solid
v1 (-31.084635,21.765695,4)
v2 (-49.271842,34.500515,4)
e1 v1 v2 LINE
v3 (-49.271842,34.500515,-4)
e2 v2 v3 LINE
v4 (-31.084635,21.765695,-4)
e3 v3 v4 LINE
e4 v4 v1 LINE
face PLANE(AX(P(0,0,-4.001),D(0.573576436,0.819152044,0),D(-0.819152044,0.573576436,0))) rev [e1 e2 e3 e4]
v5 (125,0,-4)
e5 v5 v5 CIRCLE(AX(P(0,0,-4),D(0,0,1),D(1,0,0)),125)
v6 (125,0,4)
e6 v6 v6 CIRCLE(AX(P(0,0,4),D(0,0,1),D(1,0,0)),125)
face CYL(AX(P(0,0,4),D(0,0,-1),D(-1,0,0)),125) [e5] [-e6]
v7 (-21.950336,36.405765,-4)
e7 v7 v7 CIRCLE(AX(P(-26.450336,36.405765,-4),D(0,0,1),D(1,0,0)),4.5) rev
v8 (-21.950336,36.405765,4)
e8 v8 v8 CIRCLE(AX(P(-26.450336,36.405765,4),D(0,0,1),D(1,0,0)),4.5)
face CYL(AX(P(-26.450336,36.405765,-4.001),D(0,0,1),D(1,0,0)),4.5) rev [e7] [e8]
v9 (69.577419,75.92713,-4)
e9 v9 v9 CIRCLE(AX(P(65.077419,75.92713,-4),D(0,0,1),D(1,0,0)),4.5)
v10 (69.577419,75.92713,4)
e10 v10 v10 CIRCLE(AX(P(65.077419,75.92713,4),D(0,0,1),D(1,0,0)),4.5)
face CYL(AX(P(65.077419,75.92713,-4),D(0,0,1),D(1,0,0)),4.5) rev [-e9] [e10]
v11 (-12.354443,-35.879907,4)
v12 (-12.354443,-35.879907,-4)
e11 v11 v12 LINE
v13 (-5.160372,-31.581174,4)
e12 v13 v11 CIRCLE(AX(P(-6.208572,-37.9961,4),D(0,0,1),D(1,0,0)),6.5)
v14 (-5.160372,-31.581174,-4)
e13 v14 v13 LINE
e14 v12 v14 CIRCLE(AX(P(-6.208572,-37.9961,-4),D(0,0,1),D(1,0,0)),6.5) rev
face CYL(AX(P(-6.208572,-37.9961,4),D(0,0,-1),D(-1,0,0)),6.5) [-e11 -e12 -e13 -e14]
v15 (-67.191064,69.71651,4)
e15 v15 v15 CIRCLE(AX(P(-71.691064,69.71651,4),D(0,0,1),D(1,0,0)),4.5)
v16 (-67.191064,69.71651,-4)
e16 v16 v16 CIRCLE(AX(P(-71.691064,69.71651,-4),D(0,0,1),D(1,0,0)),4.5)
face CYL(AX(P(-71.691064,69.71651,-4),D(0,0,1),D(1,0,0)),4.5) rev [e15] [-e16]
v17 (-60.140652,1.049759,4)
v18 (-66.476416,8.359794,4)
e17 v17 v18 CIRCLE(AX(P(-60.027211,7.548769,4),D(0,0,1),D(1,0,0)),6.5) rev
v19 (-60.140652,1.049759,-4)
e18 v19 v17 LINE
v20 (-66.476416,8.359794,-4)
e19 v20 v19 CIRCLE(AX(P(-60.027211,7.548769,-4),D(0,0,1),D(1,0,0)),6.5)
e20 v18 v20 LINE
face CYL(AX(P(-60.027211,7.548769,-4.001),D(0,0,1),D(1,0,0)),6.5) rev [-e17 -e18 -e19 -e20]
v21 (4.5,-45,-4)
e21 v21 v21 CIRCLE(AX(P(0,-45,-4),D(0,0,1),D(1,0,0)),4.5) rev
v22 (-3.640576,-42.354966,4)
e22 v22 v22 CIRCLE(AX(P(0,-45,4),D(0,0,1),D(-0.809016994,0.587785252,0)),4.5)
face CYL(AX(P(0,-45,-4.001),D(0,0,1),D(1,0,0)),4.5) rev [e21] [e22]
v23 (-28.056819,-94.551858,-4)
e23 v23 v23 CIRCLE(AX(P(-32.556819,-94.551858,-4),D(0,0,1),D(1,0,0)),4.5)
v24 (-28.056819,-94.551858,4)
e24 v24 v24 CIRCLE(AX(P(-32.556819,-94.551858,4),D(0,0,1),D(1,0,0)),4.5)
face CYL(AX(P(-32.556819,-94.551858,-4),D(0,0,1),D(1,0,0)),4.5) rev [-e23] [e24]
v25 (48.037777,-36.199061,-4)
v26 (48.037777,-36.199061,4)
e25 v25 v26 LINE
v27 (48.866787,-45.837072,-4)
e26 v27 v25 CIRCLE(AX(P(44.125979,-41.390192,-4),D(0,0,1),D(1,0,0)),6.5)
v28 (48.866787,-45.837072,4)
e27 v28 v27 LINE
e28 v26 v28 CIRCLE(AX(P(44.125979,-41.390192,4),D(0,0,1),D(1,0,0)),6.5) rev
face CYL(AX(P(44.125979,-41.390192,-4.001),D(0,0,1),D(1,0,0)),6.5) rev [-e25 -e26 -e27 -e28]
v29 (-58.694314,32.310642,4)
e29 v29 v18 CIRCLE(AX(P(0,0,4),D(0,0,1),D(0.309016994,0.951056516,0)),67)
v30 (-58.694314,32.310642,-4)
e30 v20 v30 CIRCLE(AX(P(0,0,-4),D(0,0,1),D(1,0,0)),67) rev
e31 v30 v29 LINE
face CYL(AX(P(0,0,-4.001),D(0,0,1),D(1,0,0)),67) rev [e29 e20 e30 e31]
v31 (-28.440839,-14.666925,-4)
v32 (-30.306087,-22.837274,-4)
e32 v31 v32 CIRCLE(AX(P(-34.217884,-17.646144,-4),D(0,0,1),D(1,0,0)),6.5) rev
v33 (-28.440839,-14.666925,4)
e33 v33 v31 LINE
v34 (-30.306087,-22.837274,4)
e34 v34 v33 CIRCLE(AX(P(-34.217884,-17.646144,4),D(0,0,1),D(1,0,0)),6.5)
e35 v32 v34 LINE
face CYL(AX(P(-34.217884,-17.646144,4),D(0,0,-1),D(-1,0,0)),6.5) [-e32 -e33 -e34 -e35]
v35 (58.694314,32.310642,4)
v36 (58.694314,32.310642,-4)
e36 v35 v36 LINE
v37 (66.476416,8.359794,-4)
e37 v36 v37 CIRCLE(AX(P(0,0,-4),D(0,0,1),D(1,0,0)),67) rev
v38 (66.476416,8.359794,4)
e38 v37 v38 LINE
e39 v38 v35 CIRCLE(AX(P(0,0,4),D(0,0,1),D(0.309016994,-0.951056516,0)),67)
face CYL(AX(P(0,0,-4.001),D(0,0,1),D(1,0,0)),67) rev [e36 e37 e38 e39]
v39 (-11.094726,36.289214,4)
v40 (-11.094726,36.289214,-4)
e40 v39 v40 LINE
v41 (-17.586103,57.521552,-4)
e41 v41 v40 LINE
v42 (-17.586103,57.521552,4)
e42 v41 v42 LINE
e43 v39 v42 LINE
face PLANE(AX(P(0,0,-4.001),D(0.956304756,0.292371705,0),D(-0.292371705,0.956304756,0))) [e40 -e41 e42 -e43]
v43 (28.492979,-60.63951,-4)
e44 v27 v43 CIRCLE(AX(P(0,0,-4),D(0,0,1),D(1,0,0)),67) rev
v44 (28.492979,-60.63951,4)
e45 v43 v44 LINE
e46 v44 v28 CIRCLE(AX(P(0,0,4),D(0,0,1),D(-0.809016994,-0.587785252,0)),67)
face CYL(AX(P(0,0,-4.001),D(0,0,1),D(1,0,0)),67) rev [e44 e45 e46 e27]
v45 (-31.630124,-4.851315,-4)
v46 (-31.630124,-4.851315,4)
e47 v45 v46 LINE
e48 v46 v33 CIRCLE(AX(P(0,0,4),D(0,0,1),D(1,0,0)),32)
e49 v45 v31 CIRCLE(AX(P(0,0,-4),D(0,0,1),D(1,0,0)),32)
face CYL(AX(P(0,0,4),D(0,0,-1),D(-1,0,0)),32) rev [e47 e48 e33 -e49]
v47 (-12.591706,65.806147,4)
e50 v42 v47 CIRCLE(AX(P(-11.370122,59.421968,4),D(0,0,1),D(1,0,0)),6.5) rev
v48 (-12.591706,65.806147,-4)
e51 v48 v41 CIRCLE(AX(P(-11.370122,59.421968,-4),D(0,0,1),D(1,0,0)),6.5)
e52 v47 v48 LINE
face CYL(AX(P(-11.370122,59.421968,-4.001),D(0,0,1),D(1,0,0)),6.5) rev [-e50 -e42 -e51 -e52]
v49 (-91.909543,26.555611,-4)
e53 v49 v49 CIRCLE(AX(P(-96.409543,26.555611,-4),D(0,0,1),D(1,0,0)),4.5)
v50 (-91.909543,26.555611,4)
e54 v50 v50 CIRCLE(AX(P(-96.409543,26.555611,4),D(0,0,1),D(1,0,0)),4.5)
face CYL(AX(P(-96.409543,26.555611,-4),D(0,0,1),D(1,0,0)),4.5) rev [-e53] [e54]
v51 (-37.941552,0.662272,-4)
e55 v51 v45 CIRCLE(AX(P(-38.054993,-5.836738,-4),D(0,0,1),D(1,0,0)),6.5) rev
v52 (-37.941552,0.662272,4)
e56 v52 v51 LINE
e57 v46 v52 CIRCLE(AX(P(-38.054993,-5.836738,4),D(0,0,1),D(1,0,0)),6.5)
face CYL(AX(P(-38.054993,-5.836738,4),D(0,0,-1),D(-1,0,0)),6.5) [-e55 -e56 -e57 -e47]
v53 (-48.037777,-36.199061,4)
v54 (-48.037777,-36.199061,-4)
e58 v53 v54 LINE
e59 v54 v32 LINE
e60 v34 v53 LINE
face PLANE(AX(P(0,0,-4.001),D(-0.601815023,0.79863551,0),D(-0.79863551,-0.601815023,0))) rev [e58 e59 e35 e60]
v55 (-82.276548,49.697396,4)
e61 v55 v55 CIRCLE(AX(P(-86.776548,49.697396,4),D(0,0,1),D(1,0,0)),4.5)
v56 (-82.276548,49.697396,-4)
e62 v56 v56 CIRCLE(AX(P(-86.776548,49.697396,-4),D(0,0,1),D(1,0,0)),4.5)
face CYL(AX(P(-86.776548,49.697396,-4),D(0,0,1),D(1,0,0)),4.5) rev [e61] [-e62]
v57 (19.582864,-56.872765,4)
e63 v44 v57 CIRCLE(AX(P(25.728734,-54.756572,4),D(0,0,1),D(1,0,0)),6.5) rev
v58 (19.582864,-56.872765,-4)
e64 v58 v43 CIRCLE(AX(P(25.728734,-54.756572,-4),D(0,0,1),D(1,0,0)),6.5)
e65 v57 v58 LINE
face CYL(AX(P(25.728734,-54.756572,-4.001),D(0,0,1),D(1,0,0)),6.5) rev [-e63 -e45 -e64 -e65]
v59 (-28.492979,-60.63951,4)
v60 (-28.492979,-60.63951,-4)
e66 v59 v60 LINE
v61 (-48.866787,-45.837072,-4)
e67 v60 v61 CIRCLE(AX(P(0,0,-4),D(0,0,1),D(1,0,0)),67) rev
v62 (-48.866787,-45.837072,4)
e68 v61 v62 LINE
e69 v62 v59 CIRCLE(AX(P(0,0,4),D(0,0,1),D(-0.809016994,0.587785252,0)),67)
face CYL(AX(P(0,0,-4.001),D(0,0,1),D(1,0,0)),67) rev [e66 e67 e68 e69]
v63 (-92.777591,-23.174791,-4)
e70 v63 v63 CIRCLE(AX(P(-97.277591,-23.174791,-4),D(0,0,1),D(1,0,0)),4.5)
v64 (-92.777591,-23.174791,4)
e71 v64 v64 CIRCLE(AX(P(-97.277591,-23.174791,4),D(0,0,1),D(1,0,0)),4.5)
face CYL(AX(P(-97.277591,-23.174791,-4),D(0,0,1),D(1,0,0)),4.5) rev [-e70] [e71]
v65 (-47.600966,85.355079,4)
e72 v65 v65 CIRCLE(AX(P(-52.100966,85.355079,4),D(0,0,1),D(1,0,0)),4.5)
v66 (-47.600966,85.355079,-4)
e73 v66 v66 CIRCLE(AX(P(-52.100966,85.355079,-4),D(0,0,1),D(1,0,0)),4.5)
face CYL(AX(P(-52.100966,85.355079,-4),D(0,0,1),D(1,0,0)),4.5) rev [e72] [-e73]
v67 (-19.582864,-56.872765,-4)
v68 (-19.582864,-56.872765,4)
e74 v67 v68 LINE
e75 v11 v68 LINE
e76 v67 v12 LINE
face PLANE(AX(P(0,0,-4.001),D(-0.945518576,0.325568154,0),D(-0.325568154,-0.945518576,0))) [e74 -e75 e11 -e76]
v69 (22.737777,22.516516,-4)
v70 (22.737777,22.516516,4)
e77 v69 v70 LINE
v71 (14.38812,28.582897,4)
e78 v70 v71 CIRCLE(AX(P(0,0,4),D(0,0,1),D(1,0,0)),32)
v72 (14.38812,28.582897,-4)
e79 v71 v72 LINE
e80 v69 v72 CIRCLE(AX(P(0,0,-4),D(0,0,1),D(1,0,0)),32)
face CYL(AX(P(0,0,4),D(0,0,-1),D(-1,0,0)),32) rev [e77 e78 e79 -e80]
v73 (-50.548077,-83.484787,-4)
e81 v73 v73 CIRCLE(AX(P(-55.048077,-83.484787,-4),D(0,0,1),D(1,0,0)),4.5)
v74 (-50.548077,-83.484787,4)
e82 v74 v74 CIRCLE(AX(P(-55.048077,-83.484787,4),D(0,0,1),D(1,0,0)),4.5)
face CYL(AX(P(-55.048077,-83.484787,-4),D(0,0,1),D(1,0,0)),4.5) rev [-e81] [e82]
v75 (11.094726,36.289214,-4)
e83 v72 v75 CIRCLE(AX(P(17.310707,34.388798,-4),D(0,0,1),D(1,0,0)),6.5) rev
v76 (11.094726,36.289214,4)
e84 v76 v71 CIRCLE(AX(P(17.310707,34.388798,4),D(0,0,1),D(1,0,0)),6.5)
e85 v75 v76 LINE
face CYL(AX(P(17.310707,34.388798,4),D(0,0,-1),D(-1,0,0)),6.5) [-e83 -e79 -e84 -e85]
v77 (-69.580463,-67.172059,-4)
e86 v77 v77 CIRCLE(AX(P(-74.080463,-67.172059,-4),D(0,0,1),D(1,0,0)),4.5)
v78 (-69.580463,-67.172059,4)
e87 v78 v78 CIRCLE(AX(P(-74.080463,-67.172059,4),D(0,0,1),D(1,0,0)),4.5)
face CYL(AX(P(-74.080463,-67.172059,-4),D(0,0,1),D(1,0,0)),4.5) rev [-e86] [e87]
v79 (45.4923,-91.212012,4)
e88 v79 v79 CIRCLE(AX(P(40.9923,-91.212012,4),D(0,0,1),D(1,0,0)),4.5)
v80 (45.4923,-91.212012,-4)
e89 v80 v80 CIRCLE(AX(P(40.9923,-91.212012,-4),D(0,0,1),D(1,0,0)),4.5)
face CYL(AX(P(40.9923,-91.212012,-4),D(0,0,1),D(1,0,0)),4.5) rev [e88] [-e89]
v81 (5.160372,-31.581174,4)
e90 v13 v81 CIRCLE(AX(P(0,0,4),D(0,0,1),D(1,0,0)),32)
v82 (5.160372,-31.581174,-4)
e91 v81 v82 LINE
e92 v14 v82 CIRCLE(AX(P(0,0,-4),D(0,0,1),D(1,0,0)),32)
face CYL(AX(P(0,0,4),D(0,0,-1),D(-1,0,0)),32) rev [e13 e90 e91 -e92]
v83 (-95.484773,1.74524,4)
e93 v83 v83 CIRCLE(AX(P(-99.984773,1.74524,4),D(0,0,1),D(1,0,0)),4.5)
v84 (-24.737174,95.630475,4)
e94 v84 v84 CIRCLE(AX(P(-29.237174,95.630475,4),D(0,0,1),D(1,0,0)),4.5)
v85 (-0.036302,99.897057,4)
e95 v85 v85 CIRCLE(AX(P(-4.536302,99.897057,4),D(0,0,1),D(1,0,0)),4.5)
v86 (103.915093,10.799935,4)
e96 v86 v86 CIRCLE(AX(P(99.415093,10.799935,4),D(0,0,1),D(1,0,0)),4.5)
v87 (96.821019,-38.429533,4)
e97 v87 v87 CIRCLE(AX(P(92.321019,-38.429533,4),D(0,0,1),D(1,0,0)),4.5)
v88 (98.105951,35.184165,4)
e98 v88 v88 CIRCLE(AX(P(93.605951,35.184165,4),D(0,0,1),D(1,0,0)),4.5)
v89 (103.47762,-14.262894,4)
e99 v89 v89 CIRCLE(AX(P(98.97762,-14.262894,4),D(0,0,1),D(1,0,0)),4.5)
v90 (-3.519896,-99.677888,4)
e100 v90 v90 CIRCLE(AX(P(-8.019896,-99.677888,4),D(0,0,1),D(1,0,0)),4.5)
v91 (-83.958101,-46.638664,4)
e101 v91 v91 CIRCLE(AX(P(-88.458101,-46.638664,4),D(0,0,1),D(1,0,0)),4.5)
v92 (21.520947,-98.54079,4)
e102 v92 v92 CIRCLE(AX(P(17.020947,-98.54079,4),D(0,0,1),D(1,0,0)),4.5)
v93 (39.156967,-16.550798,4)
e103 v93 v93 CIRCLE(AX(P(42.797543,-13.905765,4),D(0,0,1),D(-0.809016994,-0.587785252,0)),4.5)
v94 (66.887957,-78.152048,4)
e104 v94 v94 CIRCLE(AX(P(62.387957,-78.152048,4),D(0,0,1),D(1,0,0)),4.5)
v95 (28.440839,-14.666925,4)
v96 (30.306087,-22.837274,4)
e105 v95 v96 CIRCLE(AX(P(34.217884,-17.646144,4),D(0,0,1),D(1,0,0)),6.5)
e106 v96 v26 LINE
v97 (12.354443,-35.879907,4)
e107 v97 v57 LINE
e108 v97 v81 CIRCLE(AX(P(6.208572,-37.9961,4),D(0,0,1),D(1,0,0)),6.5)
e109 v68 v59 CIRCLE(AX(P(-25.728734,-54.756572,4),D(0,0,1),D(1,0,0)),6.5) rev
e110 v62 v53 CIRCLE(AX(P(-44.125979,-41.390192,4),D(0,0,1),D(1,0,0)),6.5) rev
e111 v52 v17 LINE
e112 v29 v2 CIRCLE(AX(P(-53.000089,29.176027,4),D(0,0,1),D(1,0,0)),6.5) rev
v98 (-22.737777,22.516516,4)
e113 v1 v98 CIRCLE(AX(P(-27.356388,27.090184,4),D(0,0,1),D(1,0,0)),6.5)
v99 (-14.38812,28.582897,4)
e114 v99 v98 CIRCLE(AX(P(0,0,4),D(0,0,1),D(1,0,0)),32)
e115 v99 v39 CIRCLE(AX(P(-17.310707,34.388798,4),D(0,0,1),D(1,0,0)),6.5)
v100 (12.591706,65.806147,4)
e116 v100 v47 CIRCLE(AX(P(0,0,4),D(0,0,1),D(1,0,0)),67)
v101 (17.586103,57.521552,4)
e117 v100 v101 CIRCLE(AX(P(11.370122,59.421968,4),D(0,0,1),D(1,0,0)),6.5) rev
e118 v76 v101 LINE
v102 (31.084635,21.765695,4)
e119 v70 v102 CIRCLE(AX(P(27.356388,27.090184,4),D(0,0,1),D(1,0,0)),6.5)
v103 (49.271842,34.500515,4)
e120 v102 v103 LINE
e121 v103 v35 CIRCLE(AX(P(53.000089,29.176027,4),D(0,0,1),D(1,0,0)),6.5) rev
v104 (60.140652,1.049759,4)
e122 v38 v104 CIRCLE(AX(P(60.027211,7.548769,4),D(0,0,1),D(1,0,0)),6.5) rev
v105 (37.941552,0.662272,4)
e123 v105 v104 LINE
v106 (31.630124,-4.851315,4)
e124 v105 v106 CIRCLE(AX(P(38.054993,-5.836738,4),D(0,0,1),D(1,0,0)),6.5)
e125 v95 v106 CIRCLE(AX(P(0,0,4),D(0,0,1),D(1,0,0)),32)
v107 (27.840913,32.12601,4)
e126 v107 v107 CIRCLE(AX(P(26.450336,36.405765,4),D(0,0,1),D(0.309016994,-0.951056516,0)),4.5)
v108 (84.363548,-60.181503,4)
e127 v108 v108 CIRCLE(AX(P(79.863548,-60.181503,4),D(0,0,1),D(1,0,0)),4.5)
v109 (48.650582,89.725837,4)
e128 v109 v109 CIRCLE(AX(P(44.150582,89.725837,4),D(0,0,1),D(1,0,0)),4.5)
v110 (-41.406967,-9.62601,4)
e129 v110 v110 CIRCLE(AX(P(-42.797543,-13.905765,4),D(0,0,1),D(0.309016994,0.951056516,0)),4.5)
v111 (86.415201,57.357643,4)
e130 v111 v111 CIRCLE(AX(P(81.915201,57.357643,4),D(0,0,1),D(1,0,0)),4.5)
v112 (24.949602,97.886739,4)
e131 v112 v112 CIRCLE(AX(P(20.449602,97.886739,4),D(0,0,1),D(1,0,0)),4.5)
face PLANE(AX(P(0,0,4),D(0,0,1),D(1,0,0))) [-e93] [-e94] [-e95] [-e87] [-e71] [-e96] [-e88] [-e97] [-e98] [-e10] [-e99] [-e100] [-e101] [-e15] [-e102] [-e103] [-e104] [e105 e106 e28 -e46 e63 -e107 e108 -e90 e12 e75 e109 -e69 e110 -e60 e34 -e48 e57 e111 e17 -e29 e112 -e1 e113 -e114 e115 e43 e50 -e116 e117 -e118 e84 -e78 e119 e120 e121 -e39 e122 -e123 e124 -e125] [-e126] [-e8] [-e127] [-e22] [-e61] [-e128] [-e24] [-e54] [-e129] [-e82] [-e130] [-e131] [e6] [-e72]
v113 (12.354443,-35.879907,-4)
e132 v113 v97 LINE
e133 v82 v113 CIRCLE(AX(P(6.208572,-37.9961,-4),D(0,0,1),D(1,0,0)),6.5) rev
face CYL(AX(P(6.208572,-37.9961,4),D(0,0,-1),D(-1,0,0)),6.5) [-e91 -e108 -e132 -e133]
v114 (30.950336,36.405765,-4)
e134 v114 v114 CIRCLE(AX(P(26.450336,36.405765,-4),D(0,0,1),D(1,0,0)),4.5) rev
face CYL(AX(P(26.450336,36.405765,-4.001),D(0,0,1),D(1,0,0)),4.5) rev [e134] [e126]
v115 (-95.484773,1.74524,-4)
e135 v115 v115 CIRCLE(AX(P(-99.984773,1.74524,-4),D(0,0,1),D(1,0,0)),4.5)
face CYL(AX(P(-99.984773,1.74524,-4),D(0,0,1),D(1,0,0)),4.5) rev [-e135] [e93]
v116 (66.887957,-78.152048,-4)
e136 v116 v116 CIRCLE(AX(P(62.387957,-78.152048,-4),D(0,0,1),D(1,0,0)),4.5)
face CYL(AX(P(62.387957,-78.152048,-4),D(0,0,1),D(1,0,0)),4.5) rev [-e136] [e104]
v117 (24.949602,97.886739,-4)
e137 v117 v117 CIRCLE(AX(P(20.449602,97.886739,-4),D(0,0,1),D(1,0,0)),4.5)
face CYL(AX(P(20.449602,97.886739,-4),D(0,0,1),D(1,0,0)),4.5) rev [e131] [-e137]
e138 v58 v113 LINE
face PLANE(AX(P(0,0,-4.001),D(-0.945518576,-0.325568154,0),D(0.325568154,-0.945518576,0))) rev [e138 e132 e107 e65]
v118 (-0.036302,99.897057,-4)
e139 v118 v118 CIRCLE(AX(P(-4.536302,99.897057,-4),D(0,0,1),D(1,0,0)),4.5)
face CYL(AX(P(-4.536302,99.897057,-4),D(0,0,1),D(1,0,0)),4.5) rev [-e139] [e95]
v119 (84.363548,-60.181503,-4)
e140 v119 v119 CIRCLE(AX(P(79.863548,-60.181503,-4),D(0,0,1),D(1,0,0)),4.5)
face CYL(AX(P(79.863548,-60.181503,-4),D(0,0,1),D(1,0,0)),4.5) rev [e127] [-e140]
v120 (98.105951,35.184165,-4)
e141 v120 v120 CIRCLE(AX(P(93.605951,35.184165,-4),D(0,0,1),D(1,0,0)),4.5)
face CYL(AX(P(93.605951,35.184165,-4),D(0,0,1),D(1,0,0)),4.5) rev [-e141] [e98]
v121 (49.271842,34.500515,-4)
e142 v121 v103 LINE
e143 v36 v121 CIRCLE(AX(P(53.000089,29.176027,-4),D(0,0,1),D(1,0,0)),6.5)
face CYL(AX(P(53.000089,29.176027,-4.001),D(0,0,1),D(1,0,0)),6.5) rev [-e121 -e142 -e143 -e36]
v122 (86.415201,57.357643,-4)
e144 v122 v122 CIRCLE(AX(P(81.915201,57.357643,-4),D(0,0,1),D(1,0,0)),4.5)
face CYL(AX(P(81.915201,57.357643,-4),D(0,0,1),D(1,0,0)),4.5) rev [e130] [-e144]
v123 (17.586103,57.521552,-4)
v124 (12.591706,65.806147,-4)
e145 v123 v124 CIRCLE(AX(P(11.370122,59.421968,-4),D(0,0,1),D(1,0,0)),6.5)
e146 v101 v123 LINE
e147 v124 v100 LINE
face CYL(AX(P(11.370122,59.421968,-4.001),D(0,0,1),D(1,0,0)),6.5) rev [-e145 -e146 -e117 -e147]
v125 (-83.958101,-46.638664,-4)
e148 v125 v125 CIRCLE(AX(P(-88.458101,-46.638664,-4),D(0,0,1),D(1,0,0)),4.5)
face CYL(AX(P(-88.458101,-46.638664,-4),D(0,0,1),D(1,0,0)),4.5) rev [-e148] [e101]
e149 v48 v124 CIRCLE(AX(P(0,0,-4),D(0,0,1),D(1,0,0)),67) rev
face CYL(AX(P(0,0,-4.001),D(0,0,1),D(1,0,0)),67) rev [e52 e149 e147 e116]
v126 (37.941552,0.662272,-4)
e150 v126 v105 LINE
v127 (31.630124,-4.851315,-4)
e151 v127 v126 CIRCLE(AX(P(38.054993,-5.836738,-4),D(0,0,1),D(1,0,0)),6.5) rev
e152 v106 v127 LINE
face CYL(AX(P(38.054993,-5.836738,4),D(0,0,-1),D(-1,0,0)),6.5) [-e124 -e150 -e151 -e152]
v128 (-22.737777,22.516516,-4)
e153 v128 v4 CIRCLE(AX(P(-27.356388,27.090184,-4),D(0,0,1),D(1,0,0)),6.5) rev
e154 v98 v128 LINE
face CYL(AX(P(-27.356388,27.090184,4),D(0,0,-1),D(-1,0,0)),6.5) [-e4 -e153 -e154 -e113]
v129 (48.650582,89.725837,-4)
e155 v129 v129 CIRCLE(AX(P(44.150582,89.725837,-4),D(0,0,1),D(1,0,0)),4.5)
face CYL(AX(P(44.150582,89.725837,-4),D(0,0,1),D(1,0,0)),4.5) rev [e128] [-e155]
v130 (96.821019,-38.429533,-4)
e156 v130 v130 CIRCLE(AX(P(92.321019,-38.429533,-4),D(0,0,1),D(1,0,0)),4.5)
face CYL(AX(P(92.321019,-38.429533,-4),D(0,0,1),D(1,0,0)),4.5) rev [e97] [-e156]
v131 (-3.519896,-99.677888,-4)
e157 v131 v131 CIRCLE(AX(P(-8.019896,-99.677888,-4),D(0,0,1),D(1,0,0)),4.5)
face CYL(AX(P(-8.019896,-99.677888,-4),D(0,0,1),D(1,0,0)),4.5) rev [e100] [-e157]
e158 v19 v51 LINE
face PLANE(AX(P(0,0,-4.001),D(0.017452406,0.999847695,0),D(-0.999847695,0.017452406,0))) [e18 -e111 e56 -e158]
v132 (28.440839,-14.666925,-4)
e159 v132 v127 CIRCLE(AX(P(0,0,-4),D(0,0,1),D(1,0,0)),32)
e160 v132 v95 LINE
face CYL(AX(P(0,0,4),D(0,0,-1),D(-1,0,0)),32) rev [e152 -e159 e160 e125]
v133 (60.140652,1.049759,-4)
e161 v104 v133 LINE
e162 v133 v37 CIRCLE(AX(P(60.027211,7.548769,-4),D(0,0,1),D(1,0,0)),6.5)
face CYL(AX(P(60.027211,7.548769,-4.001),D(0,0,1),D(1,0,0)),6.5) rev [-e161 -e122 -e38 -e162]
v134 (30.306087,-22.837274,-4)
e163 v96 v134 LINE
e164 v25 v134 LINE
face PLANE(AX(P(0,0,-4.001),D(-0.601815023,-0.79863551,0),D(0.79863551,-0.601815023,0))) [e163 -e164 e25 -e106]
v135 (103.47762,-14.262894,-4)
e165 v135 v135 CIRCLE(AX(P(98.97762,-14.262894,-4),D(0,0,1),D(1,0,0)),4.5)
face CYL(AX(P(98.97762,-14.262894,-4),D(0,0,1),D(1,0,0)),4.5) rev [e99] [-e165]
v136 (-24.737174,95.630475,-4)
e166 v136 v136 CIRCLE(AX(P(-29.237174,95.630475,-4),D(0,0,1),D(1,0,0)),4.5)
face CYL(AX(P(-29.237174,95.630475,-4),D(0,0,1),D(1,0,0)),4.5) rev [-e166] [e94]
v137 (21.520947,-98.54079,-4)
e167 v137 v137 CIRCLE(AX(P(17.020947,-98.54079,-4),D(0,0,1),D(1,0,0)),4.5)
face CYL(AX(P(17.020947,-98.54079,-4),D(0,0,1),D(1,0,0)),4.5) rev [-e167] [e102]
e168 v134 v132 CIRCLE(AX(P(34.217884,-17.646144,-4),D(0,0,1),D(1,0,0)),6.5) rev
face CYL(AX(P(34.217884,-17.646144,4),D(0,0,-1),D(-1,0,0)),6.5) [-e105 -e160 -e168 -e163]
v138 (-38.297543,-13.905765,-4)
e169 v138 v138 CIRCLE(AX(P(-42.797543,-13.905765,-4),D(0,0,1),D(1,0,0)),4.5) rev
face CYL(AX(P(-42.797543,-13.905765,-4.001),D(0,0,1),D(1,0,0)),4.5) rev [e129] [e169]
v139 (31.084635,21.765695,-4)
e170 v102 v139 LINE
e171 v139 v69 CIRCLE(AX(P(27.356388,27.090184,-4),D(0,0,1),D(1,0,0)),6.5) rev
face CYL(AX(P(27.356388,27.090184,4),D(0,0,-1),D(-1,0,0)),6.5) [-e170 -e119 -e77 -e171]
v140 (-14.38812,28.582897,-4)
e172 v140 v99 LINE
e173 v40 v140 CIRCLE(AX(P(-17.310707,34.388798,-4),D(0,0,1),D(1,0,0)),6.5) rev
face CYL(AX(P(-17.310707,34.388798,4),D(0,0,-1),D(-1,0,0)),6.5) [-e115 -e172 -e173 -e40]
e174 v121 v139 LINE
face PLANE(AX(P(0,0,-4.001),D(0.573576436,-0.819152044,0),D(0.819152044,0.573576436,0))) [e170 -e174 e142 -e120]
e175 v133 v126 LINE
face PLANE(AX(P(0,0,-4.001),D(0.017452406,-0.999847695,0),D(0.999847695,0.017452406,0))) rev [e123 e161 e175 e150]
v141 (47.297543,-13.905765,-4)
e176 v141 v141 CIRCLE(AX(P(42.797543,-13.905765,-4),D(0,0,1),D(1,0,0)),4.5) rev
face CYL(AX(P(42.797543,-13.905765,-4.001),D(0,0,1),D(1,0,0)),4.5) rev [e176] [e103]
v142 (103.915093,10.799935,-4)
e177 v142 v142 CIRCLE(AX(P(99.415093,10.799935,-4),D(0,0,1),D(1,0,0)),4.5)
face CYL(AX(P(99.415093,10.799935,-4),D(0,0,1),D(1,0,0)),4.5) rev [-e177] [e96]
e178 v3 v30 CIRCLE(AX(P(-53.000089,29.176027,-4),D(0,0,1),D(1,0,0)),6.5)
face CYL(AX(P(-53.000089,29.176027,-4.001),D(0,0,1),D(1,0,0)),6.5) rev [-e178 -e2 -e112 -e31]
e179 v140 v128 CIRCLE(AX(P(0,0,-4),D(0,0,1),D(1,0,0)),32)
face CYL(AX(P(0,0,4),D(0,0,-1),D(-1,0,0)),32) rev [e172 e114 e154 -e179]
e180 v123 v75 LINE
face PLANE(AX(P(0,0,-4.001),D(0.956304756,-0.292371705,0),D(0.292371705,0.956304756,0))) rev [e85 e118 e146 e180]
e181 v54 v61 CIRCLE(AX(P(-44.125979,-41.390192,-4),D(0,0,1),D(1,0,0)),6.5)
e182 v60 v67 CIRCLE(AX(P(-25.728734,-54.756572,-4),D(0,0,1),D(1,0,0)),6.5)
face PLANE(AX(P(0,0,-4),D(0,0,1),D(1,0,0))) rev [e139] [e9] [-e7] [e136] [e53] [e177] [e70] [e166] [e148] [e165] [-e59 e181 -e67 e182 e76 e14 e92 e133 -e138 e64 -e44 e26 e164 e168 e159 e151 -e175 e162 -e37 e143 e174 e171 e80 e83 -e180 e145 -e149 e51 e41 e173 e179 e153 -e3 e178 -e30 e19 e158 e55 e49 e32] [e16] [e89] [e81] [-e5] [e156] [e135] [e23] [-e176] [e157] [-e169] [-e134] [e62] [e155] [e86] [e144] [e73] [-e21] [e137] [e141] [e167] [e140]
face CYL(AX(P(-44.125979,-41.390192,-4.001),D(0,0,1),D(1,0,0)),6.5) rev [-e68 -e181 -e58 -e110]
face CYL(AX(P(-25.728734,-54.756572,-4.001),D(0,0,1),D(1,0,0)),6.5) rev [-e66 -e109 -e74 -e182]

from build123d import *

# Parameters (mm, degrees)
SKETCH1_R               = 125
SKETCH1_R_2             = 32
BOSS_EXTRUDE1_DEPTH     = 4
CUT_EXTRUDE1_REACH      = 178.958
SKETCH2_R               = 4.5
CIRPATTERN2_COUNT       = 5
FILL_START              = -4
FILL_PATTERN1_OUTLINE_R = 4.5
FILL_PATTERN1_DEPTH     = 8
FILLET1_R               = 6.5


# Read off the part's stored shape, not the designer's step: Fill Pattern1
with BuildPart() as part:
    # Sketch1 → Boss-Extrude1 (new, symmetric)
    with BuildSketch(Plane.XY):
        Circle(SKETCH1_R)
        Circle(SKETCH1_R_2, mode=Mode.SUBTRACT)
    extrude(amount=BOSS_EXTRUDE1_DEPTH, both=True)

    # Sketch2 → Cut-Extrude1 (cut, up to next)
    with BuildSketch(Plane.XY.offset(4), mode=Mode.PRIVATE) as cut_extrude1_sk1:
        with BuildLine():
            ThreePointArc((-9.355894551, 30.601752191), (0, 32), (9.355894551, 30.601752191))
            Line((9.355894551, 30.601752191), (19.588904216, 64.07241865))
            ThreePointArc((19.588904216, 64.07241865), (0, 67), (-19.588904216, 64.07241865))
            Line((-19.588904216, 64.07241865), (-9.355894551, 30.601752191))
        make_face()
    cut_extrude1_tool1 = extrude(cut_extrude1_sk1.sketch, amount=-CUT_EXTRUDE1_REACH, mode=Mode.PRIVATE) & part.part
    # Sketch2 → Cut-Extrude1 (cut, up to next)
    with BuildSketch(Plane.XY.offset(4), mode=Mode.PRIVATE) as cut_extrude1_sk2:
        with Locations((-26.450336353, 36.405764747)):
            Circle(SKETCH2_R)
    cut_extrude1_tool2 = extrude(cut_extrude1_sk2.sketch, amount=-CUT_EXTRUDE1_REACH, mode=Mode.PRIVATE) & part.part
    cut_extrude1_1 = cut_extrude1_tool1.solids().sort_by_distance((0, 50.80907, 4))[0]
    add(cut_extrude1_1, mode=Mode.SUBTRACT)
    cut_extrude1_2 = cut_extrude1_tool2.solids().sort_by_distance((-26.450336, 36.405765, 4))[0]
    add(cut_extrude1_2, mode=Mode.SUBTRACT)
    cut_extrude1 = cut_extrude1_1 + cut_extrude1_2  # Cut-Extrude1 as one shape, for the pattern or mirror that repeats it

    # CirPattern2: Cut-Extrude1 ×5 about axis
    cirpattern2_axis = Axis((0, 0, 0), (0, 0, 1))
    for i in range(1, CIRPATTERN2_COUNT):
        add(cut_extrude1.rotate(cirpattern2_axis, i * 360 / CIRPATTERN2_COUNT), mode=Mode.SUBTRACT)

    # Fill Pattern1 outline → Fill Pattern1 (cut)
    with BuildSketch(Plane.XY.offset(FILL_START)):
        with Locations((-99.984772584, 1.745240337)):
            Circle(FILL_PATTERN1_OUTLINE_R)
        with Locations((-97.277590889, -23.174790656)):
            Circle(FILL_PATTERN1_OUTLINE_R)
        with Locations((-88.45810059, -46.638664341)):
            Circle(FILL_PATTERN1_OUTLINE_R)
        with Locations((-74.080462697, -67.172059239)):
            Circle(FILL_PATTERN1_OUTLINE_R)
        with Locations((-55.048077077, -83.484786633)):
            Circle(FILL_PATTERN1_OUTLINE_R)
        with Locations((-32.556818514, -94.551857867)):
            Circle(FILL_PATTERN1_OUTLINE_R)
        with Locations((-8.019895501, -99.677888152)):
            Circle(FILL_PATTERN1_OUTLINE_R)
        with Locations((17.020946849, -98.540790155)):
            Circle(FILL_PATTERN1_OUTLINE_R)
        with Locations((40.992300316, -91.212011924)):
            Circle(FILL_PATTERN1_OUTLINE_R)
        with Locations((62.387956603, -78.152047549)):
            Circle(FILL_PATTERN1_OUTLINE_R)
        with Locations((79.863547937, -60.181502622)):
            Circle(FILL_PATTERN1_OUTLINE_R)
        with Locations((92.321018643, -38.429532573)):
            Circle(FILL_PATTERN1_OUTLINE_R)
        with Locations((98.977620023, -14.262893677)):
            Circle(FILL_PATTERN1_OUTLINE_R)
        with Locations((99.415093329, 10.799935264)):
            Circle(FILL_PATTERN1_OUTLINE_R)
        with Locations((93.605950506, 35.184164534)):
            Circle(FILL_PATTERN1_OUTLINE_R)
        with Locations((81.915201361, 57.357643328)):
            Circle(FILL_PATTERN1_OUTLINE_R)
        with Locations((65.077418659, 75.927130427)):
            Circle(FILL_PATTERN1_OUTLINE_R)
        with Locations((44.150582211, 89.725836661)):
            Circle(FILL_PATTERN1_OUTLINE_R)
        with Locations((20.449602116, 97.886738569)):
            Circle(FILL_PATTERN1_OUTLINE_R)
        with Locations((-4.536301881, 99.897056672)):
            Circle(FILL_PATTERN1_OUTLINE_R)
        with Locations((-29.23717354, 95.63047529)):
            Circle(FILL_PATTERN1_OUTLINE_R)
        with Locations((-52.100966252, 85.355079421)):
            Circle(FILL_PATTERN1_OUTLINE_R)
        with Locations((-71.691063833, 69.716509979)):
            Circle(FILL_PATTERN1_OUTLINE_R)
        with Locations((-86.776548405, 49.697395796)):
            Circle(FILL_PATTERN1_OUTLINE_R)
        with Locations((-96.409543491, 26.555611442)):
            Circle(FILL_PATTERN1_OUTLINE_R)
    extrude(amount=FILL_PATTERN1_DEPTH, mode=Mode.SUBTRACT)

    # Fillet1
    fillet1_edges = [part.edges().sort_by_distance(p)[0] for p in [
        (19.588904216, 64.07241865, 0),
        (9.355894551, 30.601752191, 0),
        (-9.355894551, 30.601752191, 0),
        (-19.588904216, 64.07241865, 0),
        (-53.508579173, -40.321606551, 0),
        (-25.556336322, -19.258080741, 0),
        (-10.418180943, -30.256594419, 0),
        (-21.813066349, -63.349744565, 0),
        (21.813066349, -63.349744565, 0),
        (10.418180943, -30.256594419, 0),
        (25.556336322, -19.258080741, 0),
        (53.508579173, -40.321606551, 0),
        (66.989795575, 1.169311231, 0),
        (31.995126245, 0.558477006, 0),
        (26.212865417, 18.354445963, 0),
        (54.883186967, 38.429621236, 0),
        (-54.883186967, 38.429621236, 0),
        (-26.212865417, 18.354445963, 0),
        (-31.995126245, 0.558477006, 0),
        (-66.989795575, 1.169311231, 0),
    ]]
    fillet(fillet1_edges, radius=FILLET1_R)


solid = part.part
